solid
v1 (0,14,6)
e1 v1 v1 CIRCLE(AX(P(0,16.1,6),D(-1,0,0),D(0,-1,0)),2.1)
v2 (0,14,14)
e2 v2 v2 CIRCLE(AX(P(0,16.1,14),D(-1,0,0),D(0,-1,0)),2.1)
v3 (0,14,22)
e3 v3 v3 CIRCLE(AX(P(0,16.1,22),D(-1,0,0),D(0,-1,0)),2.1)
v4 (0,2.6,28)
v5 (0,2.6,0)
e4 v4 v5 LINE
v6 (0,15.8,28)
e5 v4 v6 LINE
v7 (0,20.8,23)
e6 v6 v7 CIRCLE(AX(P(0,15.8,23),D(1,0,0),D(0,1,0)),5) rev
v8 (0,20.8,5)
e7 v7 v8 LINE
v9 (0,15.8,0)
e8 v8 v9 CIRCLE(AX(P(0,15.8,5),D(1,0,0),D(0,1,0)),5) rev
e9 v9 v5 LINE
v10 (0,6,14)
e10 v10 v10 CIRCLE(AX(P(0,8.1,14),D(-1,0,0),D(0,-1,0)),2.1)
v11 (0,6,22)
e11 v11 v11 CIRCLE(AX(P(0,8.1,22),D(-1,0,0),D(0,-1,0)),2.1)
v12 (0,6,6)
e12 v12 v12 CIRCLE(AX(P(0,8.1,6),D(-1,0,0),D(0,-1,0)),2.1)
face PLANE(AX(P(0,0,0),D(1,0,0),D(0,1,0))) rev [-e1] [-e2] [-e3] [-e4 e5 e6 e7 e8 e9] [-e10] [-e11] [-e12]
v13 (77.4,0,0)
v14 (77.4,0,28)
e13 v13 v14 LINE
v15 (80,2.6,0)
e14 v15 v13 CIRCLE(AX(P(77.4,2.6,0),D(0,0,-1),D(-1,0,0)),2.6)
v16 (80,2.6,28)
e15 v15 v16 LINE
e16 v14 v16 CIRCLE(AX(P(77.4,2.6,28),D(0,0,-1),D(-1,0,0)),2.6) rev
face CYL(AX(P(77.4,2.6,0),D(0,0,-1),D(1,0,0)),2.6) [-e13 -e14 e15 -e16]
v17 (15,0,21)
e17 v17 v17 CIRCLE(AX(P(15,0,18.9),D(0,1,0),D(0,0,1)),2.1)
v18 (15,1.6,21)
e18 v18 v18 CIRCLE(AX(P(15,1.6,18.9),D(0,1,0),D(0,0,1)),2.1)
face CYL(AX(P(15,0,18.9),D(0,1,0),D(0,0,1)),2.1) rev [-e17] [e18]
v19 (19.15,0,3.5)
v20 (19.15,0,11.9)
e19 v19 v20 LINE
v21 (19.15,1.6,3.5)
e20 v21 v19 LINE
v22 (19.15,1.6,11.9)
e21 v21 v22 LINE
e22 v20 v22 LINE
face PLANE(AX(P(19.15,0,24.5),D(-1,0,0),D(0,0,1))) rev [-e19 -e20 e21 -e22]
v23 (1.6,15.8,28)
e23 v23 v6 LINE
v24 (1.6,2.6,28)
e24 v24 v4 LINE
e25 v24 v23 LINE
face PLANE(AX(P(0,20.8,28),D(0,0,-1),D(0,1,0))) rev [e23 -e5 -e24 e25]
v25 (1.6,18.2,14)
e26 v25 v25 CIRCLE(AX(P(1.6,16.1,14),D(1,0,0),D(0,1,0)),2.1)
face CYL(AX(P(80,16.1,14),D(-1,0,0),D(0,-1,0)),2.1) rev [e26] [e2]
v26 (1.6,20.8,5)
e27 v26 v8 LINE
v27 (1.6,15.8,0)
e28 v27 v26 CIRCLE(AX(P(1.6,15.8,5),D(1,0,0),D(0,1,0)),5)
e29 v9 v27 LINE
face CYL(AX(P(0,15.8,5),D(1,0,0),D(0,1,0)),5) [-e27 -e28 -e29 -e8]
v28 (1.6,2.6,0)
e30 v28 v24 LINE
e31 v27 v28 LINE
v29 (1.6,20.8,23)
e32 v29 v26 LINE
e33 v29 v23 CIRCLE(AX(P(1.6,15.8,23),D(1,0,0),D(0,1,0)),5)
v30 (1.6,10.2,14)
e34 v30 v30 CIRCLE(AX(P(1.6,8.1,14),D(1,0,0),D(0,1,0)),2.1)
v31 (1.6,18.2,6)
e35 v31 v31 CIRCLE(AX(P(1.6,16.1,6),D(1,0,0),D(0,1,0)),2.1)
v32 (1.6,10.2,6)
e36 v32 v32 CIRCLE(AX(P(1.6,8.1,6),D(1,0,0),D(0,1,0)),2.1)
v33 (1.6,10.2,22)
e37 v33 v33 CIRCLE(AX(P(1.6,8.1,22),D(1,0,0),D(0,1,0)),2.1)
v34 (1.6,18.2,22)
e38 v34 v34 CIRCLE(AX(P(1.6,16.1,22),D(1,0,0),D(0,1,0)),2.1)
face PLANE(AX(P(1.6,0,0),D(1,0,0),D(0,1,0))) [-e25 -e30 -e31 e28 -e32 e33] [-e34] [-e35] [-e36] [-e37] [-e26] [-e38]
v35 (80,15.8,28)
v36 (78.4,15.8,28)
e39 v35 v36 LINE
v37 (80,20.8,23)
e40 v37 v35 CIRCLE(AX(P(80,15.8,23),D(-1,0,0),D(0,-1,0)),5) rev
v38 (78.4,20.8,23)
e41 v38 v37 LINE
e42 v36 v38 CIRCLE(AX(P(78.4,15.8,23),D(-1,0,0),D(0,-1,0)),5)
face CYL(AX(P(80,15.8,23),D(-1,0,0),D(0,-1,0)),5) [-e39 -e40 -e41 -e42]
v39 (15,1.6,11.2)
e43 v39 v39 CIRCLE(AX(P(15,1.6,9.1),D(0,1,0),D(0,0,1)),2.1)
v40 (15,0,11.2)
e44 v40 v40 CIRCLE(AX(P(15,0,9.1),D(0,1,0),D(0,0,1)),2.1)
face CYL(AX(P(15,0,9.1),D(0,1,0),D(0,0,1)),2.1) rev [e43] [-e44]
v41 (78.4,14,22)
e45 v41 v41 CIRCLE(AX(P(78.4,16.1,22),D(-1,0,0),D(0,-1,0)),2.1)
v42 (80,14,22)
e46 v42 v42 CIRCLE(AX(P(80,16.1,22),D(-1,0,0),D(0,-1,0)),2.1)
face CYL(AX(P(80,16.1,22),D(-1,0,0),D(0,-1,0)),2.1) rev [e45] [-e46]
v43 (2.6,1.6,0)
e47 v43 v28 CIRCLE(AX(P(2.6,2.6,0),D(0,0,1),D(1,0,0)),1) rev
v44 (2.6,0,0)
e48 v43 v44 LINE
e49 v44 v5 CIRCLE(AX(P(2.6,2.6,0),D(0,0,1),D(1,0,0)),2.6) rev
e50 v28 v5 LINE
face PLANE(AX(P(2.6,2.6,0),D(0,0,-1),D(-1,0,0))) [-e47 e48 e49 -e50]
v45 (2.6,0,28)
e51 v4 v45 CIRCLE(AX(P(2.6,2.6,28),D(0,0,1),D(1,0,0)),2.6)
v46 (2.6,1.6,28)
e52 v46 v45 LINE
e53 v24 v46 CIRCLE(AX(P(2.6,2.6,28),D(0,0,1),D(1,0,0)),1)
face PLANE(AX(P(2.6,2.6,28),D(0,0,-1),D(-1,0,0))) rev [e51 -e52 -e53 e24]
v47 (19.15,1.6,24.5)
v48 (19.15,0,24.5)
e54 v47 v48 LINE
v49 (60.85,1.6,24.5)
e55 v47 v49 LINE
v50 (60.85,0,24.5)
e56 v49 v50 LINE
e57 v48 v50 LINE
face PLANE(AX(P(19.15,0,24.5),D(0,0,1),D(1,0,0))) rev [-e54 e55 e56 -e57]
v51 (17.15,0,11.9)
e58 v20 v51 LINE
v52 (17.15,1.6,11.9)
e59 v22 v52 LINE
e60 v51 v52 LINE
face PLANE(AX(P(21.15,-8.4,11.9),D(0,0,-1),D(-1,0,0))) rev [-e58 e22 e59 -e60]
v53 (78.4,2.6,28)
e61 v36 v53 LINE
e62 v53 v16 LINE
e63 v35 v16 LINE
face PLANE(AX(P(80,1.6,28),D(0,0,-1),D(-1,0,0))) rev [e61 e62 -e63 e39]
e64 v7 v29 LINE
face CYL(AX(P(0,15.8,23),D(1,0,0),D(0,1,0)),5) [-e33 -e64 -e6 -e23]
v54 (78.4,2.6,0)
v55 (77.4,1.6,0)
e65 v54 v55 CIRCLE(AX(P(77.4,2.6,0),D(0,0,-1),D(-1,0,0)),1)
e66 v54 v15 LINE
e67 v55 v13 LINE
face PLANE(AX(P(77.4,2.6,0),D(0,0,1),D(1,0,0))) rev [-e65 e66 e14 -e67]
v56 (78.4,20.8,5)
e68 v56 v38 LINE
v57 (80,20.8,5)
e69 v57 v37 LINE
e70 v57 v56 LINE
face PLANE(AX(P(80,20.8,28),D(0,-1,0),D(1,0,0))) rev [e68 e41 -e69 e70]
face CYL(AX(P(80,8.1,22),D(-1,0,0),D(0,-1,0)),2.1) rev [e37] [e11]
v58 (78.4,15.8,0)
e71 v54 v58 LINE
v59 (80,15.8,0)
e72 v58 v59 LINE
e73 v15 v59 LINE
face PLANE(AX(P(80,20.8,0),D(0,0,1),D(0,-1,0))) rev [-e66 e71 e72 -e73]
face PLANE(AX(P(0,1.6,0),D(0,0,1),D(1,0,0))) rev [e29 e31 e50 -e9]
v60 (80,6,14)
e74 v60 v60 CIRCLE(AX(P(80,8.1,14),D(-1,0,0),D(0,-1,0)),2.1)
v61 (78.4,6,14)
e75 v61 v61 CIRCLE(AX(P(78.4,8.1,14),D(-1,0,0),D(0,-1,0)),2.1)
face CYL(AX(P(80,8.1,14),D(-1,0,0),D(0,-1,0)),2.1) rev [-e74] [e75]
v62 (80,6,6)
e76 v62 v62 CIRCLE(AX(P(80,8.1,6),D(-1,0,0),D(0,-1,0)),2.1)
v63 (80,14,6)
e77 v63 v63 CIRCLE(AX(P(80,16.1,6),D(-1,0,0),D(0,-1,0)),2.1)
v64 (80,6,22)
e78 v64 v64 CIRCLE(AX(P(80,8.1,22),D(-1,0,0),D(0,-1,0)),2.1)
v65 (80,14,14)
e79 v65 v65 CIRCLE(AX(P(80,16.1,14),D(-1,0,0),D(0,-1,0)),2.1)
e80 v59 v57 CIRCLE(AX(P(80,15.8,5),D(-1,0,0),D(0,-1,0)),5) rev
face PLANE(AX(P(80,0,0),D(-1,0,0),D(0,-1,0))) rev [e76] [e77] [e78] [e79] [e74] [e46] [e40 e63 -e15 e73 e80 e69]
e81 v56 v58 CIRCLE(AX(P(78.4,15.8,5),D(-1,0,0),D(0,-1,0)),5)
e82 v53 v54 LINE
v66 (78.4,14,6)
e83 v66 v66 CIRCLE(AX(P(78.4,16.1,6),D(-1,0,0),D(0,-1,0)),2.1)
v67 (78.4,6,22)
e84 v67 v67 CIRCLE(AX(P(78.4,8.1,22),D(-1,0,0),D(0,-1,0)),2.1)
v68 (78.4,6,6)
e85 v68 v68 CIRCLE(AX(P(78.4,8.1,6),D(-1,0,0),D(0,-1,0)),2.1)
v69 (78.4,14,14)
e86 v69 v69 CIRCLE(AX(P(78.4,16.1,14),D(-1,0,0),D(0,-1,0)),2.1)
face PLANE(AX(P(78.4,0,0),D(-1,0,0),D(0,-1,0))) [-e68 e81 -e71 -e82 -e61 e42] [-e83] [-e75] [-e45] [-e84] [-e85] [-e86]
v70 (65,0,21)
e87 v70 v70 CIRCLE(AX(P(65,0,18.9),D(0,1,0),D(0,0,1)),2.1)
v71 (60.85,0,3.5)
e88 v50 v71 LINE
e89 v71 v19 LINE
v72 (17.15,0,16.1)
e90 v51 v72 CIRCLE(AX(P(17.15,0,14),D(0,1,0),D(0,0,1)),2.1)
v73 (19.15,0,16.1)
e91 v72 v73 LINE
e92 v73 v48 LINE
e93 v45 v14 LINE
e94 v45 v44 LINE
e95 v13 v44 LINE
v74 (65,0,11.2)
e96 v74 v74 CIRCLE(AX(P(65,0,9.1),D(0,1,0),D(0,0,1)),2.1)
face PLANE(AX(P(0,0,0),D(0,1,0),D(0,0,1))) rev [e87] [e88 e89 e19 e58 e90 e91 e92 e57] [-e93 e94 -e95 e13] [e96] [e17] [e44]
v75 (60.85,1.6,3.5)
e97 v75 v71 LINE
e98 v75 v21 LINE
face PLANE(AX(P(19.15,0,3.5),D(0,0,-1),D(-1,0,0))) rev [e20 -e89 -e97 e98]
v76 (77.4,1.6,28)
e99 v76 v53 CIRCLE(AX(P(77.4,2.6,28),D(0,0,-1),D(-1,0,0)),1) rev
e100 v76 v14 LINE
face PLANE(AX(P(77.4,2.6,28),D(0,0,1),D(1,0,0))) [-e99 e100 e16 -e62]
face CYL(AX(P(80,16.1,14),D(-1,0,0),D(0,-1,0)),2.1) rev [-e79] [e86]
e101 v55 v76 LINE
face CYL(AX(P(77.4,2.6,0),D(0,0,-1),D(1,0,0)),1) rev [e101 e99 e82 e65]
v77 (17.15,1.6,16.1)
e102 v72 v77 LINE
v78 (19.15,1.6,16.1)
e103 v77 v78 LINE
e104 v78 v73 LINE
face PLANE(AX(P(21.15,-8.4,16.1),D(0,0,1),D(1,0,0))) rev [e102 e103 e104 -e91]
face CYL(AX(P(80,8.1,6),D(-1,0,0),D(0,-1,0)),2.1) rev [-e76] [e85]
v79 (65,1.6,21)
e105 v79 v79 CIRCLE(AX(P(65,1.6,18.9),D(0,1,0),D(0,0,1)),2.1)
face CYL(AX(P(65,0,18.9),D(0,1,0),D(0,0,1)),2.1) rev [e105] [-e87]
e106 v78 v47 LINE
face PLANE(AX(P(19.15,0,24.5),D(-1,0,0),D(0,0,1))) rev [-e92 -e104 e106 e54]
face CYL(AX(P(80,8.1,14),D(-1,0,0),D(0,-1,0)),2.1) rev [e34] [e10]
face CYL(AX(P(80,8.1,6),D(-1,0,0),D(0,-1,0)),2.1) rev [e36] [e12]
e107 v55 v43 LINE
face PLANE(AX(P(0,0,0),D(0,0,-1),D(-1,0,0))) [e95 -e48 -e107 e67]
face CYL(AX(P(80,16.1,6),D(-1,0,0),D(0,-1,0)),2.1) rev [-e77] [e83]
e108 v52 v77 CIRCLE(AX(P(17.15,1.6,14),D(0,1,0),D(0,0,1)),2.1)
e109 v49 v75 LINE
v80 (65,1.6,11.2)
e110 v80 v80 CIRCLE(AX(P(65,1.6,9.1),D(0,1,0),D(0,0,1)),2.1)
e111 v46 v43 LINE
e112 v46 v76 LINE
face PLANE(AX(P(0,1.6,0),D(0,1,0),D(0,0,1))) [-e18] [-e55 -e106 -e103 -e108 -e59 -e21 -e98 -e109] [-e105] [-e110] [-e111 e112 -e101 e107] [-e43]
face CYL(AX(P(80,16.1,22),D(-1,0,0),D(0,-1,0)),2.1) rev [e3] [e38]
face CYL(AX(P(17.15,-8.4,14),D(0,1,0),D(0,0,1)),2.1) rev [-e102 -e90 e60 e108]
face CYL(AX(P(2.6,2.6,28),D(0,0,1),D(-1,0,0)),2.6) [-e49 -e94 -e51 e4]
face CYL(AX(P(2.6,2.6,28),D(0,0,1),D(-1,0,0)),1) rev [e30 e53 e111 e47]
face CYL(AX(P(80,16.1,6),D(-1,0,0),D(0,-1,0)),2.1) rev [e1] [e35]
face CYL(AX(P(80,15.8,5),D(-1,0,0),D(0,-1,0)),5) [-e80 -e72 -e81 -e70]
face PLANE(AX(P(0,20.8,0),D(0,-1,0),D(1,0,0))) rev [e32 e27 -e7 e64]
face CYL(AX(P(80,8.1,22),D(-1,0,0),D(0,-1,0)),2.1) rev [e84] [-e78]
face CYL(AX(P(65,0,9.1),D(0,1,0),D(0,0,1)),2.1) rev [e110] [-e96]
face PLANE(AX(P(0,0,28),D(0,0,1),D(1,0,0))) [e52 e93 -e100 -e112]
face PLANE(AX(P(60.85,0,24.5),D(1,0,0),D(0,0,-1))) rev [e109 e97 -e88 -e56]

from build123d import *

# Parameters (mm, degrees)
SKETCH1_W                      = 80
SKETCH1_H                      = 28
BOSS_EXTRUDE1_DEPTH            = 1.6
SKETCH2_R                      = 2.1
CUT_EXTRUDE1_DEPTH             = 85.77358079
LPATTERN1_COUNT                = 2
LPATTERN1_PITCH                = 50
LPATTERN1_COUNT_DIR2           = 2
LPATTERN1_PITCH_DIR2           = 9.8
SKETCH15_W                     = 41.7
SKETCH15_H                     = 21
CUT_EXTRUDE3_DEPTH             = 85.77358079
EDGE_FLANGE1_STRIP_W           = 8.4
EDGE_FLANGE1_STRIP_H           = 1.6
EDGE_FLANGE1_STRIP_CUT_DEPTH   = 28
EDGE_FLANGE1_STRIP_2_W         = 8.4
EDGE_FLANGE1_STRIP_2_H         = 1.6
EDGE_FLANGE1_STRIP_CUT_2_DEPTH = 28
EDGE_FLANGE1_DEPTH             = 28
EDGE_FLANGE1_BEND_DEPTH        = 28
FILLET1_R                      = 5
SKETCH14_R                     = 2.1
CUT_EXTRUDE2_DEPTH             = 88.273363634
LPATTERN2_COUNT                = 3
LPATTERN2_PITCH                = 8
LPATTERN2_COUNT_DIR2           = 2
LPATTERN2_PITCH_DIR2           = 8
CUT_EXTRUDE4_DEPTH             = 10


# Sheet-metal steps are written as plain solids
with BuildPart() as part:
    # Sketch1 → Boss-Extrude1 (new body)
    with BuildSketch(Plane(origin=(0, 0, 0), x_dir=(1, 0, 0), z_dir=(0, 1, 0))):
        with Locations((40, -14)):
            Rectangle(SKETCH1_W, SKETCH1_H)
    extrude(amount=BOSS_EXTRUDE1_DEPTH)

    # Sketch2 → Cut-Extrude1 (cut, through all)
    with BuildSketch(Plane(origin=(0, 1.6, 0), x_dir=(1, 0, 0), z_dir=(0, 1, 0))):
        with Locations(Location((15, -9.1, 0), (0, 0, 270))):
            Circle(SKETCH2_R)
    cut_extrude1 = extrude(amount=-CUT_EXTRUDE1_DEPTH, mode=Mode.SUBTRACT)

    # LPattern1: Cut-Extrude1 2 × 2
    with Locations(*[(i * LPATTERN1_PITCH, 0, j * LPATTERN1_PITCH_DIR2) for i in range(LPATTERN1_COUNT) for j in range(LPATTERN1_COUNT_DIR2) if (i, j) != (0, 0)]):
        add(cut_extrude1, mode=Mode.SUBTRACT)

    # Sketch15 → Cut-Extrude3 (cut, through all)
    with BuildSketch(Plane(origin=(0, 1.6, 0), x_dir=(1, 0, 0), z_dir=(0, 1, 0))):
        with Locations((40, -14)):
            Rectangle(SKETCH15_W, SKETCH15_H)
    extrude(amount=-CUT_EXTRUDE3_DEPTH, mode=Mode.SUBTRACT)

    # Edge-Flange1 strip (across the edge) → Edge-Flange1 strip cut (cut)
    with BuildSketch(Plane(origin=(80, 1.6, 28), x_dir=(-1, 0, 0), z_dir=(0, 0, -1))):
        with Locations((-1.6, -0.8)):
            Rectangle(EDGE_FLANGE1_STRIP_W, EDGE_FLANGE1_STRIP_H)
    extrude(amount=EDGE_FLANGE1_STRIP_CUT_DEPTH, mode=Mode.SUBTRACT)

    # Edge-Flange1 strip 2 (across the edge) → Edge-Flange1 strip cut 2 (cut)
    with BuildSketch(Plane(origin=(0, 1.6, 0), x_dir=(1, 0, 0), z_dir=(0, 0, 1))):
        with Locations((-1.6, -0.8)):
            Rectangle(EDGE_FLANGE1_STRIP_2_W, EDGE_FLANGE1_STRIP_2_H)
    extrude(amount=EDGE_FLANGE1_STRIP_CUT_2_DEPTH, mode=Mode.SUBTRACT)

    # Edge-Flange1 section (across the edge) → Edge-Flange1 (add)
    with BuildSketch(Plane(origin=(80, 1.6, 28), x_dir=(-1, 0, 0), z_dir=(0, 0, -1))):
        with BuildLine():
            Line((0, 1), (0, 19.2))
            Line((0, 19.2), (1.6, 19.2))
            Line((1.6, 19.2), (1.6, 1))
            ThreePointArc((1.6, 1), (1.892893219, 0.292893219), (2.6, 0))
            Line((2.6, 0), (2.6, -1.6))
            ThreePointArc((2.6, -1.6), (0.761522369, -0.838477631), (0, 1))
        make_face()
    extrude(amount=EDGE_FLANGE1_DEPTH)

    # Edge-Flange1 section 2 (across the edge) → Edge-Flange1 bend (add)
    with BuildSketch(Plane(origin=(0, 1.6, 0), x_dir=(1, 0, 0), z_dir=(0, 0, 1))):
        with BuildLine():
            Line((0, 1), (0, 19.2))
            Line((0, 19.2), (1.6, 19.2))
            Line((1.6, 19.2), (1.6, 1))
            ThreePointArc((1.6, 1), (1.892893219, 0.292893219), (2.6, 0))
            Line((2.6, 0), (2.6, -1.6))
            ThreePointArc((2.6, -1.6), (0.761522369, -0.838477631), (0, 1))
        make_face()
    extrude(amount=EDGE_FLANGE1_BEND_DEPTH)

    # Fillet1
    fillet1_edges = [part.edges().sort_by_distance(p)[0] for p in [
        (79.2, 20.8, 28),
        (79.2, 20.8, 0),
        (0.8, 20.8, 0),
        (0.8, 20.8, 28),
    ]]
    fillet(fillet1_edges, radius=FILLET1_R)

    # Sketch14 → Cut-Extrude2 (cut, through all)
    with BuildSketch(Plane.ZY):
        with Locations(Location((6, 8.1, 0), (0, 0, 270))):
            Circle(SKETCH14_R)
    cut_extrude2 = extrude(amount=-CUT_EXTRUDE2_DEPTH, mode=Mode.SUBTRACT)

    # LPattern2: Cut-Extrude2 3 × 2
    with Locations(*[(0, j * LPATTERN2_PITCH_DIR2, i * LPATTERN2_PITCH) for i in range(LPATTERN2_COUNT) for j in range(LPATTERN2_COUNT_DIR2) if (i, j) != (0, 0)]):
        add(cut_extrude2, mode=Mode.SUBTRACT)

    # Sketch16 → Cut-Extrude4 (cut)
    with BuildSketch(Plane(origin=(0, 1.6, 0), x_dir=(1, 0, 0), z_dir=(0, 1, 0))):
        with BuildLine():
            Line((21.15, -16.1), (17.15, -16.1))
            ThreePointArc((17.15, -16.1), (15.05, -14), (17.15, -11.9))
            Line((17.15, -11.9), (21.15, -11.9))
            ThreePointArc((21.15, -11.9), (23.25, -14), (21.15, -16.1))
        make_face()
    extrude(amount=-CUT_EXTRUDE4_DEPTH, mode=Mode.SUBTRACT)


solid = part.part
